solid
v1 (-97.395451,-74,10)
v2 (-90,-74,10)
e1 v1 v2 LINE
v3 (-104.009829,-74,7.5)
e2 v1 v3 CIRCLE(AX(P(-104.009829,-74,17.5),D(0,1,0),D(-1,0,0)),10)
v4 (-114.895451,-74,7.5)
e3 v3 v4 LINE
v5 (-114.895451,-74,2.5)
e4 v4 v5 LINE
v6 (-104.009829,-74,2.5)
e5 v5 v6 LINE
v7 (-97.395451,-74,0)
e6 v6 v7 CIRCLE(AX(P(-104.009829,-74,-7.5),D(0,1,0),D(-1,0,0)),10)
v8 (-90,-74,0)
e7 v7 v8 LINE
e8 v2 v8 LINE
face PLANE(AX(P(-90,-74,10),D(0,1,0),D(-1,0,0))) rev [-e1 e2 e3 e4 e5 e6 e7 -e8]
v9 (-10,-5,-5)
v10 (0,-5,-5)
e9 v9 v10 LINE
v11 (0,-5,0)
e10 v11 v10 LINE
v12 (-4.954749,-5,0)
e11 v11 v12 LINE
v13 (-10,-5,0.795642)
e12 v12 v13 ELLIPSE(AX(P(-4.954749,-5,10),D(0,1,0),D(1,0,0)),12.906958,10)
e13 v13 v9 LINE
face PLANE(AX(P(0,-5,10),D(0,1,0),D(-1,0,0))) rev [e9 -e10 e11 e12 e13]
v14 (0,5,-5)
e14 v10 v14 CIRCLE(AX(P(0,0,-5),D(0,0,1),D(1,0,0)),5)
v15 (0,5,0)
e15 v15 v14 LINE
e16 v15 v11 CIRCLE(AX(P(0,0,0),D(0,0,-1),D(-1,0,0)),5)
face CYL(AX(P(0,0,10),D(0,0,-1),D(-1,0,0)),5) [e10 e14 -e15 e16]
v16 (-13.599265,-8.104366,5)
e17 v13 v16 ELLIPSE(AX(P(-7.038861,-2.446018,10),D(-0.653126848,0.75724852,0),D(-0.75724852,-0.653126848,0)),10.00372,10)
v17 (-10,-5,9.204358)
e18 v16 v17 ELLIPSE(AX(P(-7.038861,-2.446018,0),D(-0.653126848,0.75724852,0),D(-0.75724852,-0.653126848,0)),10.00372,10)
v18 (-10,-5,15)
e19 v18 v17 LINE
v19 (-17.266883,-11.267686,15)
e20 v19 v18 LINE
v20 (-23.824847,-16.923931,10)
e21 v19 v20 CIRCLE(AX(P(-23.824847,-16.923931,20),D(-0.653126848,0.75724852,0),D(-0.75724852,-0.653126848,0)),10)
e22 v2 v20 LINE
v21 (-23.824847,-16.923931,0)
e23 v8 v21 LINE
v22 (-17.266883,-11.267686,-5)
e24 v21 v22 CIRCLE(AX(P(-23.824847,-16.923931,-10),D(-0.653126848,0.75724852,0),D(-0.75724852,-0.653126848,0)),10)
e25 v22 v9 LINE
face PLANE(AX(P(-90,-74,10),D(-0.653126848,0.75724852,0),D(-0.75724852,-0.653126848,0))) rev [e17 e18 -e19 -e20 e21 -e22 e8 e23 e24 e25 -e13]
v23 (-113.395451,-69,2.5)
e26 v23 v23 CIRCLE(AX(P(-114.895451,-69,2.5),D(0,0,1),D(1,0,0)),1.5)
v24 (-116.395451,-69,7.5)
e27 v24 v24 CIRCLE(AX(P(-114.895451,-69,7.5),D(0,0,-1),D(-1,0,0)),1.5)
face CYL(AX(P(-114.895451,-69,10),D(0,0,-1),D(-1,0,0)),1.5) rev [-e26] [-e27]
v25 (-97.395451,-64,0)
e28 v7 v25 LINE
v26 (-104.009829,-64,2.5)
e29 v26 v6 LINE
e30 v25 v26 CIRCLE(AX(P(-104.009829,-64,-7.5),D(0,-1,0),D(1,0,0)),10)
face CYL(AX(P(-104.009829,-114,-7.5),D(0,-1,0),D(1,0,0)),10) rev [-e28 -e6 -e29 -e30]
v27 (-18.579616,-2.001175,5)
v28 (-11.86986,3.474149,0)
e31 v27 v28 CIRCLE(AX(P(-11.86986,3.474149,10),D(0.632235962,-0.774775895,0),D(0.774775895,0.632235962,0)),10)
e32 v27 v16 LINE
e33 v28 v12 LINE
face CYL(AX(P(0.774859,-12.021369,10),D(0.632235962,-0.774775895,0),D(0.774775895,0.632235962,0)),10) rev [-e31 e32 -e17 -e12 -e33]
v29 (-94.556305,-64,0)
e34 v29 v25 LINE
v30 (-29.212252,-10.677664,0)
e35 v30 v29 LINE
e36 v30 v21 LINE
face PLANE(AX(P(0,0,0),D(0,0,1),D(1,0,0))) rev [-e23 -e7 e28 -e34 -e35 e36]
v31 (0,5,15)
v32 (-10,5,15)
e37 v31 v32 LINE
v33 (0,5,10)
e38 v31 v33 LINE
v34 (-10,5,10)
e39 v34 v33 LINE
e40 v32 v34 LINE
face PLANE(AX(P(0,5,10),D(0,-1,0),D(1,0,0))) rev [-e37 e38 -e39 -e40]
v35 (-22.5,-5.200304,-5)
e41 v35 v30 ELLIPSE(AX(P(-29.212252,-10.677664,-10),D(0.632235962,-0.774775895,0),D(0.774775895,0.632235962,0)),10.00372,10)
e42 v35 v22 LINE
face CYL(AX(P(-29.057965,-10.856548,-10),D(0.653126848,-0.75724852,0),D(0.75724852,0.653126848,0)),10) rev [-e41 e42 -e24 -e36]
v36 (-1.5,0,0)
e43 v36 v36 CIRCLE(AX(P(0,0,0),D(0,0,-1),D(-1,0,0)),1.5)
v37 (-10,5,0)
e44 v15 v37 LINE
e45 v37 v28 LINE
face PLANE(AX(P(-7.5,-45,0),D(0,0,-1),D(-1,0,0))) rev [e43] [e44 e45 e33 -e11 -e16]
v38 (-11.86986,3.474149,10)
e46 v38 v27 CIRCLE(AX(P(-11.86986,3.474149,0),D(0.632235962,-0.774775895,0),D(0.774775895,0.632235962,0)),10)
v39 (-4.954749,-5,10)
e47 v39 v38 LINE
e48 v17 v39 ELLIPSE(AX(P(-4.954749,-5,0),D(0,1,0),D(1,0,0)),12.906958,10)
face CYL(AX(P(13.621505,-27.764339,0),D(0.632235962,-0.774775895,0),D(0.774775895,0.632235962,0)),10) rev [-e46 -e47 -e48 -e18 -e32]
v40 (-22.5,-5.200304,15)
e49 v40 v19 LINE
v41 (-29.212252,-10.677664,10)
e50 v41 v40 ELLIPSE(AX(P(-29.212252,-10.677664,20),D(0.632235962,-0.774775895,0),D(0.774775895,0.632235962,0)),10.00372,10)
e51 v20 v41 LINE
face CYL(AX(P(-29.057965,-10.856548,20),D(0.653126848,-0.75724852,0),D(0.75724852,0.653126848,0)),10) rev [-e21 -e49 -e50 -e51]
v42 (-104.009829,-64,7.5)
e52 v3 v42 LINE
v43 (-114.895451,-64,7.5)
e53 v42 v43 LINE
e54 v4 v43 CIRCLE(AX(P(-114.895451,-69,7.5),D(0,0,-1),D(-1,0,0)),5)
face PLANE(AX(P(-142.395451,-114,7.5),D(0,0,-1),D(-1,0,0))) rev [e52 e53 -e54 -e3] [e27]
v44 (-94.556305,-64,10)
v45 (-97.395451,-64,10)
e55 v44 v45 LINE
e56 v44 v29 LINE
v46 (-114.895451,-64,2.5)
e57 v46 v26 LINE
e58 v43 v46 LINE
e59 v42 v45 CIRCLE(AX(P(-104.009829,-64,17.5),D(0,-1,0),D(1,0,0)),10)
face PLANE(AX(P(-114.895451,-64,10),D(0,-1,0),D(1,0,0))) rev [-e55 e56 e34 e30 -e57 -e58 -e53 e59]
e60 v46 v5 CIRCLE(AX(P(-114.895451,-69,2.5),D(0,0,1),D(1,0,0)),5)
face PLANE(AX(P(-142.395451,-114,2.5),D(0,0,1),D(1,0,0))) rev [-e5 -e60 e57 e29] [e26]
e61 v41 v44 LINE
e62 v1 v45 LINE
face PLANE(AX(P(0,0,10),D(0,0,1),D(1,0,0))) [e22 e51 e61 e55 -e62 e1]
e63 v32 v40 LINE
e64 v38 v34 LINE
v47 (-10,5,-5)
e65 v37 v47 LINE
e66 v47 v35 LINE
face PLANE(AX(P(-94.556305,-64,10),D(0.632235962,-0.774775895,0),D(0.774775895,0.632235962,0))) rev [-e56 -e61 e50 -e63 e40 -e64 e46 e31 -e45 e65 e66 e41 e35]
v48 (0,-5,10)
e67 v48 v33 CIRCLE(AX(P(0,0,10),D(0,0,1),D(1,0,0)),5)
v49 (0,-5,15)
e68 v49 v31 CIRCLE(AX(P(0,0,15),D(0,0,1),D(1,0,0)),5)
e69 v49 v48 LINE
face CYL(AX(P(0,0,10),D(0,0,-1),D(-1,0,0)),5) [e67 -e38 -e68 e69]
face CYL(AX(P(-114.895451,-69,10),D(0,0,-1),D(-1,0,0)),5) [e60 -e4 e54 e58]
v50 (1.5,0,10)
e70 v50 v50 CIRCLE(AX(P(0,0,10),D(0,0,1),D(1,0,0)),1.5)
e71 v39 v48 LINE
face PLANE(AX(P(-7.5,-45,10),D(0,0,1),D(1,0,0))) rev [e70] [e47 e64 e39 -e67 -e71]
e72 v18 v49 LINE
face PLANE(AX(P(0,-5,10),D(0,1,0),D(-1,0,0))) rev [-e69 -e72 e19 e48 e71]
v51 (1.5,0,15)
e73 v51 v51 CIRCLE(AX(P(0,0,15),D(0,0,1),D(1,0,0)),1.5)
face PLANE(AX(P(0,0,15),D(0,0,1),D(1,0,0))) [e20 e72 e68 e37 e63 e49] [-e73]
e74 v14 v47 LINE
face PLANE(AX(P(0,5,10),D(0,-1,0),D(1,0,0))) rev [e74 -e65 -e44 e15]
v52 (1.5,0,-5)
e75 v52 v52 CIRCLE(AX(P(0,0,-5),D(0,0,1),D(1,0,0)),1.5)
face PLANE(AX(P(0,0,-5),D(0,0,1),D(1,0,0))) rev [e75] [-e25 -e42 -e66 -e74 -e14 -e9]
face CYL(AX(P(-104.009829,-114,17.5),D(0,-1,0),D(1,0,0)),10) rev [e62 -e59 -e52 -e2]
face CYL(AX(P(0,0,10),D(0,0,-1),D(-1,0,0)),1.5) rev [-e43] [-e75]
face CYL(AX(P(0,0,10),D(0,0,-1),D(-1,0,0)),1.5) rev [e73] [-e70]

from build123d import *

# Parameters (mm, degrees)
CROQUIS1_R              = 1.5
SALIENTE_EXTRUIR1_DEPTH = 10
CROQUIS2_W              = 45
CROQUIS2_H              = 10.081197804
CORTAR_EXTRUIR1_DEPTH   = 50
CROQUIS3_R              = 1.5
SALIENTE_EXTRUIR2_DEPTH = 10
CROQUIS4_W              = 25
CROQUIS4_H              = 10
CORTAR_EXTRUIR2_DEPTH   = 50
SALIENTE_EXTRUIR3_DEPTH = 10
CROQUIS7_W              = 22
CROQUIS7_H              = 10
CORTAR_EXTRUIR4_DEPTH   = 20
REDONDEO1_R             = 10


with BuildPart() as part:
    # Croquis1 → Saliente-Extruir1 (new body)
    with BuildSketch(Plane.XY):
        with BuildLine():
            Line((0, -5), (-10, -5))
            Line((-10, -5), (-90, -74))
            Line((-90, -74), (-114.8954508, -74))
            ThreePointArc((-114.8954508, -74), (-119.8954508, -69), (-114.8954508, -64))
            Line((-114.8954508, -64), (-94.556304917, -64))
            Line((-94.556304917, -64), (-10, 5))
            Line((-10, 5), (0, 5))
            ThreePointArc((0, 5), (5, 0), (0, -5))
        make_face()
        Circle(CROQUIS1_R, mode=Mode.SUBTRACT)
        with Locations((-114.8954508, -69)):
            Circle(CROQUIS1_R, mode=Mode.SUBTRACT)
    extrude(amount=SALIENTE_EXTRUIR1_DEPTH)

    # Croquis2 → Cortar-Extruir1 (cut)
    with BuildSketch(Plane(origin=(0, -64, 0), x_dir=(1, 0, 0), z_dir=(0, 1, 0))):
        with Locations((-119.8954508, 2.540598902)):
            Rectangle(CROQUIS2_W, CROQUIS2_H)
        with Locations((-119.8954508, -12.540598902)):
            Rectangle(CROQUIS2_W, CROQUIS2_H)
    extrude(amount=-CORTAR_EXTRUIR1_DEPTH, mode=Mode.SUBTRACT)

    # Croquis3 → Saliente-Extruir2 (add, symmetric)
    with BuildSketch(Plane.XY.offset(5)):
        with BuildLine():
            Line((0, 5), (-10, 5))
            Line((-10, 5), (-10, -5))
            Line((-10, -5), (0, -5))
            ThreePointArc((0, -5), (5, 0), (0, 5))
        make_face()
        Circle(CROQUIS3_R, mode=Mode.SUBTRACT)
    extrude(amount=SALIENTE_EXTRUIR2_DEPTH, both=True)

    # Croquis4 → Cortar-Extruir2 (cut)
    with BuildSketch(Plane(origin=(0, 5, 0), x_dir=(1, 0, 0), z_dir=(0, 1, 0))):
        with Locations((5, -5)):
            Rectangle(CROQUIS4_W, CROQUIS4_H)
    extrude(amount=-CORTAR_EXTRUIR2_DEPTH, mode=Mode.SUBTRACT)

    # Croquis5 → Saliente-Extruir3 (add, symmetric)
    with BuildSketch(Plane.XY.offset(5)):
        Polygon((-22.5, -5.200303819), (-17.266882634, -11.267686272), (-10, -5), (-10, 5), align=None)
    extrude(amount=SALIENTE_EXTRUIR3_DEPTH, both=True)

    # Croquis7 → Cortar-Extruir4 (cut)
    with BuildSketch(Plane(origin=(-6.446429036, 7.899800278, 0), x_dir=(0.7747758954984266, 0.6322359620858428, 0), z_dir=(-0.6322359620858428, 0.7747758954984267, 0))):
        with Locations((-6, -5)):
            Rectangle(CROQUIS7_W, CROQUIS7_H)
    extrude(amount=-CORTAR_EXTRUIR4_DEPTH, mode=Mode.SUBTRACT)

    # Redondeo1
    # the kernel refuses this fillet: 10 mm, written as the material it adds along each edge
    with BuildSketch(Plane(origin=(-17.266882634, -11.267686272, 0), x_dir=(0, 0, -1), z_dir=(-0.6531268480840459, 0.757248519517734, 0))) as redondeo1_piece_1_section:
        with BuildLine():
            CenterArc((10, 8.660254038), REDONDEO1_R, 180, 60)
            Line((0, 8.660254038), (-0.2, 8.660254038))
            Line((-0.2, 8.660254038), (-0.2, 0))
            Line((-0.2, 0), (0, -0.2))
            ThreePointArc((0, -0.2), (2.5, -0.2), (4.9, -0.173205081))
            Line((4.9, -0.173205081), (5, 0))
        make_face()
    redondeo1_piece_1 = extrude(amount=29.663040925, mode=Mode.PRIVATE)
    redondeo1_piece_1 = split(redondeo1_piece_1, bisect_by=Plane(origin=(-24.101226761, -6.506943775, -1.290515282), z_dir=(0.6322359620858427, -0.7747758954984267, 0)), keep=Keep.TOP, mode=Mode.PRIVATE)
    add(redondeo1_piece_1)
    with BuildSketch(Plane(origin=(-97.3954508, -64, 2.5), x_dir=(-1, 0, 0), z_dir=(0, -1, 0))) as redondeo1_piece_2:
        with BuildLine():
            CenterArc((6.614378278, 10), REDONDEO1_R, 228.590377891, 41.409622109)
            Line((0, 2.5), (-0.132287566, 2.35))
            ThreePointArc((-0.132287566, 2.35), (-0.2, 1.25), (-0.2, 0))
            Line((-0.2, 0), (0, -0.2))
            Line((0, -0.2), (6.614378278, -0.2))
            Line((6.614378278, -0.2), (6.614378278, 0))
        make_face()
    extrude(amount=10)
    with BuildSketch(Plane(origin=(-97.3954508, -64, 7.5), x_dir=(0, 0, 1), z_dir=(0, -1, 0))) as redondeo1_piece_3:
        with BuildLine():
            CenterArc((10, 6.614378278), REDONDEO1_R, 180, 41.409622109)
            Line((0, 6.614378278), (-0.2, 6.614378278))
            Line((-0.2, 6.614378278), (-0.2, 0))
            Line((-0.2, 0), (0, -0.2))
            ThreePointArc((0, -0.2), (1.25, -0.2), (2.35, -0.132287566))
            Line((2.35, -0.132287566), (2.5, 0))
        make_face()
    extrude(amount=10)
    with BuildSketch(Plane(origin=(-17.266882634, -11.267686272, 10), x_dir=(-0.757248519517734, -0.6531268480840459, 0), z_dir=(-0.6531268480840459, 0.757248519517734, 0))) as redondeo1_piece_4_section:
        with BuildLine():
            CenterArc((8.660254038, 10), REDONDEO1_R, 210, 60)
            Line((0, 5), (-0.173205081, 4.9))
            ThreePointArc((-0.173205081, 4.9), (-0.2, 2.5), (-0.2, 0))
            Line((-0.2, 0), (0, -0.2))
            Line((0, -0.2), (8.660254038, -0.2))
            Line((8.660254038, -0.2), (8.660254038, 0))
        make_face()
    redondeo1_piece_4 = extrude(amount=29.663040925, mode=Mode.PRIVATE)
    redondeo1_piece_4 = split(redondeo1_piece_4, bisect_by=Plane(origin=(-24.101226761, -6.506943775, 11.290515282), z_dir=(0.6322359620858427, -0.7747758954984267, 0)), keep=Keep.TOP, mode=Mode.PRIVATE)
    add(redondeo1_piece_4)
    with BuildSketch(Plane(origin=(-19.617619259, -2.848211077, 0), x_dir=(0, 0, 1), z_dir=(0.6322359620858428, -0.7747758954984266, 0))) as redondeo1_piece_5_section:
        with BuildLine():
            CenterArc((REDONDEO1_R, -REDONDEO1_R), REDONDEO1_R, 90, 90)
            Line((0, -REDONDEO1_R), (-REDONDEO1_R * 0.02, -REDONDEO1_R))
            Line((-REDONDEO1_R * 0.02, -REDONDEO1_R), (-REDONDEO1_R * 0.02, REDONDEO1_R * 0.02))
            Line((-REDONDEO1_R * 0.02, REDONDEO1_R * 0.02), (REDONDEO1_R, REDONDEO1_R * 0.02))
            Line((REDONDEO1_R, REDONDEO1_R * 0.02), (REDONDEO1_R, 0))
        make_face()
    redondeo1_piece_5 = extrude(amount=32.91390687, mode=Mode.PRIVATE)
    redondeo1_piece_5 = split(redondeo1_piece_5, bisect_by=Plane(origin=(-15.697629804, -5, 1.81207327), z_dir=(0, 1, 0)), keep=Keep.TOP, mode=Mode.PRIVATE)
    redondeo1_piece_5 = split(redondeo1_piece_5, bisect_by=Plane(origin=(-12.240787311, -6.932679056, 1.81207327), z_dir=(-0.6531268480840465, 0.7572485195177333, 0)), keep=Keep.TOP, mode=Mode.PRIVATE)
    add(redondeo1_piece_5)
    with BuildSketch(Plane(origin=(-19.617619259, -2.848211077, 0), x_dir=(0, 0, 1), z_dir=(0.6322359620858428, -0.7747758954984266, 0))) as redondeo1_piece_6_section:
        with BuildLine():
            CenterArc((REDONDEO1_R, -REDONDEO1_R), REDONDEO1_R, 90, 90)
            Line((0, -REDONDEO1_R), (-REDONDEO1_R * 0.02, -REDONDEO1_R))
            Line((-REDONDEO1_R * 0.02, -REDONDEO1_R), (-REDONDEO1_R * 0.02, REDONDEO1_R * 0.02))
            Line((-REDONDEO1_R * 0.02, REDONDEO1_R * 0.02), (REDONDEO1_R, REDONDEO1_R * 0.02))
            Line((REDONDEO1_R, REDONDEO1_R * 0.02), (REDONDEO1_R, 0))
        make_face()
    redondeo1_piece_6 = extrude(amount=32.91390687, mode=Mode.PRIVATE)
    redondeo1_piece_6 = split(redondeo1_piece_6, bisect_by=Plane(origin=(-7.753376127, -5, 0.000921207), z_dir=(0, 1, 0)), keep=Keep.TOP, mode=Mode.PRIVATE)
    redondeo1_piece_6 = split(redondeo1_piece_6, bisect_by=Plane(origin=(-8.357285081, -3.583158383, 0.000921207), z_dir=(0.6531268480840465, -0.7572485195177333, 0)), keep=Keep.TOP, mode=Mode.PRIVATE)
    add(redondeo1_piece_6)
    with BuildSketch(Plane(origin=(-19.617619259, -2.848211077, 0), x_dir=(0, 0, 1), z_dir=(0.6322359620858428, -0.7747758954984266, 0))) as redondeo1_piece_7_section:
        with BuildLine():
            CenterArc((REDONDEO1_R, -REDONDEO1_R), REDONDEO1_R, 90, 90)
            Line((0, -REDONDEO1_R), (-REDONDEO1_R * 0.02, -REDONDEO1_R))
            Line((-REDONDEO1_R * 0.02, -REDONDEO1_R), (-REDONDEO1_R * 0.02, REDONDEO1_R * 0.02))
            Line((-REDONDEO1_R * 0.02, REDONDEO1_R * 0.02), (REDONDEO1_R, REDONDEO1_R * 0.02))
            Line((REDONDEO1_R, REDONDEO1_R * 0.02), (REDONDEO1_R, 0))
        make_face()
    redondeo1_piece_7 = extrude(amount=32.91390687, mode=Mode.PRIVATE)
    redondeo1_piece_7 = split(redondeo1_piece_7, bisect_by=Plane(origin=(-14.976833445, -5, 2.906461965), z_dir=(0, -1, 0)), keep=Keep.TOP, mode=Mode.PRIVATE)
    redondeo1_piece_7 = split(redondeo1_piece_7, bisect_by=Plane(origin=(-13.639024157, -8.138658336, 2.906461965), z_dir=(-0.6531268480840465, 0.7572485195177333, 0)), keep=Keep.TOP, mode=Mode.PRIVATE)
    add(redondeo1_piece_7)
    with BuildSketch(Plane(origin=(-19.617619259, -2.848211077, 10), x_dir=(0, 0, -1), z_dir=(0.6322359620858428, -0.7747758954984266, 0))) as redondeo1_piece_8_section:
        with BuildLine():
            CenterArc((REDONDEO1_R, REDONDEO1_R), REDONDEO1_R, 180, 90)
            Line((0, REDONDEO1_R), (-REDONDEO1_R * 0.02, REDONDEO1_R))
            Line((-REDONDEO1_R * 0.02, REDONDEO1_R), (-REDONDEO1_R * 0.02, -REDONDEO1_R * 0.02))
            Line((-REDONDEO1_R * 0.02, -REDONDEO1_R * 0.02), (REDONDEO1_R, -REDONDEO1_R * 0.02))
            Line((REDONDEO1_R, -REDONDEO1_R * 0.02), (REDONDEO1_R, 0))
        make_face()
    redondeo1_piece_8 = extrude(amount=32.91390687, mode=Mode.PRIVATE)
    redondeo1_piece_8 = split(redondeo1_piece_8, bisect_by=Plane(origin=(-15.697629804, -5, 8.18792673), z_dir=(0, 1, 0)), keep=Keep.TOP, mode=Mode.PRIVATE)
    redondeo1_piece_8 = split(redondeo1_piece_8, bisect_by=Plane(origin=(-12.240787311, -6.932679056, 8.18792673), z_dir=(-0.6531268480840465, 0.7572485195177333, 0)), keep=Keep.TOP, mode=Mode.PRIVATE)
    add(redondeo1_piece_8)
    with BuildSketch(Plane(origin=(-19.617619259, -2.848211077, 10), x_dir=(0, 0, -1), z_dir=(0.6322359620858428, -0.7747758954984266, 0))) as redondeo1_piece_9_section:
        with BuildLine():
            CenterArc((REDONDEO1_R, REDONDEO1_R), REDONDEO1_R, 180, 90)
            Line((0, REDONDEO1_R), (-REDONDEO1_R * 0.02, REDONDEO1_R))
            Line((-REDONDEO1_R * 0.02, REDONDEO1_R), (-REDONDEO1_R * 0.02, -REDONDEO1_R * 0.02))
            Line((-REDONDEO1_R * 0.02, -REDONDEO1_R * 0.02), (REDONDEO1_R, -REDONDEO1_R * 0.02))
            Line((REDONDEO1_R, -REDONDEO1_R * 0.02), (REDONDEO1_R, 0))
        make_face()
    redondeo1_piece_9 = extrude(amount=32.91390687, mode=Mode.PRIVATE)
    redondeo1_piece_9 = split(redondeo1_piece_9, bisect_by=Plane(origin=(-7.753376127, -5, 9.999078793), z_dir=(0, 1, 0)), keep=Keep.TOP, mode=Mode.PRIVATE)
    redondeo1_piece_9 = split(redondeo1_piece_9, bisect_by=Plane(origin=(-8.357285081, -3.583158383, 9.999078793), z_dir=(0.6531268480840465, -0.7572485195177333, 0)), keep=Keep.TOP, mode=Mode.PRIVATE)
    add(redondeo1_piece_9)
    with BuildSketch(Plane(origin=(-19.617619259, -2.848211077, 10), x_dir=(0, 0, -1), z_dir=(0.6322359620858428, -0.7747758954984266, 0))) as redondeo1_piece_10_section:
        with BuildLine():
            CenterArc((REDONDEO1_R, REDONDEO1_R), REDONDEO1_R, 180, 90)
            Line((0, REDONDEO1_R), (-REDONDEO1_R * 0.02, REDONDEO1_R))
            Line((-REDONDEO1_R * 0.02, REDONDEO1_R), (-REDONDEO1_R * 0.02, -REDONDEO1_R * 0.02))
            Line((-REDONDEO1_R * 0.02, -REDONDEO1_R * 0.02), (REDONDEO1_R, -REDONDEO1_R * 0.02))
            Line((REDONDEO1_R, -REDONDEO1_R * 0.02), (REDONDEO1_R, 0))
        make_face()
    redondeo1_piece_10 = extrude(amount=32.91390687, mode=Mode.PRIVATE)
    redondeo1_piece_10 = split(redondeo1_piece_10, bisect_by=Plane(origin=(-14.976833445, -5, 7.093538035), z_dir=(0, -1, 0)), keep=Keep.TOP, mode=Mode.PRIVATE)
    redondeo1_piece_10 = split(redondeo1_piece_10, bisect_by=Plane(origin=(-13.639024157, -8.138658336, 7.093538035), z_dir=(-0.6531268480840465, 0.7572485195177333, 0)), keep=Keep.TOP, mode=Mode.PRIVATE)
    add(redondeo1_piece_10)


solid = part.part
